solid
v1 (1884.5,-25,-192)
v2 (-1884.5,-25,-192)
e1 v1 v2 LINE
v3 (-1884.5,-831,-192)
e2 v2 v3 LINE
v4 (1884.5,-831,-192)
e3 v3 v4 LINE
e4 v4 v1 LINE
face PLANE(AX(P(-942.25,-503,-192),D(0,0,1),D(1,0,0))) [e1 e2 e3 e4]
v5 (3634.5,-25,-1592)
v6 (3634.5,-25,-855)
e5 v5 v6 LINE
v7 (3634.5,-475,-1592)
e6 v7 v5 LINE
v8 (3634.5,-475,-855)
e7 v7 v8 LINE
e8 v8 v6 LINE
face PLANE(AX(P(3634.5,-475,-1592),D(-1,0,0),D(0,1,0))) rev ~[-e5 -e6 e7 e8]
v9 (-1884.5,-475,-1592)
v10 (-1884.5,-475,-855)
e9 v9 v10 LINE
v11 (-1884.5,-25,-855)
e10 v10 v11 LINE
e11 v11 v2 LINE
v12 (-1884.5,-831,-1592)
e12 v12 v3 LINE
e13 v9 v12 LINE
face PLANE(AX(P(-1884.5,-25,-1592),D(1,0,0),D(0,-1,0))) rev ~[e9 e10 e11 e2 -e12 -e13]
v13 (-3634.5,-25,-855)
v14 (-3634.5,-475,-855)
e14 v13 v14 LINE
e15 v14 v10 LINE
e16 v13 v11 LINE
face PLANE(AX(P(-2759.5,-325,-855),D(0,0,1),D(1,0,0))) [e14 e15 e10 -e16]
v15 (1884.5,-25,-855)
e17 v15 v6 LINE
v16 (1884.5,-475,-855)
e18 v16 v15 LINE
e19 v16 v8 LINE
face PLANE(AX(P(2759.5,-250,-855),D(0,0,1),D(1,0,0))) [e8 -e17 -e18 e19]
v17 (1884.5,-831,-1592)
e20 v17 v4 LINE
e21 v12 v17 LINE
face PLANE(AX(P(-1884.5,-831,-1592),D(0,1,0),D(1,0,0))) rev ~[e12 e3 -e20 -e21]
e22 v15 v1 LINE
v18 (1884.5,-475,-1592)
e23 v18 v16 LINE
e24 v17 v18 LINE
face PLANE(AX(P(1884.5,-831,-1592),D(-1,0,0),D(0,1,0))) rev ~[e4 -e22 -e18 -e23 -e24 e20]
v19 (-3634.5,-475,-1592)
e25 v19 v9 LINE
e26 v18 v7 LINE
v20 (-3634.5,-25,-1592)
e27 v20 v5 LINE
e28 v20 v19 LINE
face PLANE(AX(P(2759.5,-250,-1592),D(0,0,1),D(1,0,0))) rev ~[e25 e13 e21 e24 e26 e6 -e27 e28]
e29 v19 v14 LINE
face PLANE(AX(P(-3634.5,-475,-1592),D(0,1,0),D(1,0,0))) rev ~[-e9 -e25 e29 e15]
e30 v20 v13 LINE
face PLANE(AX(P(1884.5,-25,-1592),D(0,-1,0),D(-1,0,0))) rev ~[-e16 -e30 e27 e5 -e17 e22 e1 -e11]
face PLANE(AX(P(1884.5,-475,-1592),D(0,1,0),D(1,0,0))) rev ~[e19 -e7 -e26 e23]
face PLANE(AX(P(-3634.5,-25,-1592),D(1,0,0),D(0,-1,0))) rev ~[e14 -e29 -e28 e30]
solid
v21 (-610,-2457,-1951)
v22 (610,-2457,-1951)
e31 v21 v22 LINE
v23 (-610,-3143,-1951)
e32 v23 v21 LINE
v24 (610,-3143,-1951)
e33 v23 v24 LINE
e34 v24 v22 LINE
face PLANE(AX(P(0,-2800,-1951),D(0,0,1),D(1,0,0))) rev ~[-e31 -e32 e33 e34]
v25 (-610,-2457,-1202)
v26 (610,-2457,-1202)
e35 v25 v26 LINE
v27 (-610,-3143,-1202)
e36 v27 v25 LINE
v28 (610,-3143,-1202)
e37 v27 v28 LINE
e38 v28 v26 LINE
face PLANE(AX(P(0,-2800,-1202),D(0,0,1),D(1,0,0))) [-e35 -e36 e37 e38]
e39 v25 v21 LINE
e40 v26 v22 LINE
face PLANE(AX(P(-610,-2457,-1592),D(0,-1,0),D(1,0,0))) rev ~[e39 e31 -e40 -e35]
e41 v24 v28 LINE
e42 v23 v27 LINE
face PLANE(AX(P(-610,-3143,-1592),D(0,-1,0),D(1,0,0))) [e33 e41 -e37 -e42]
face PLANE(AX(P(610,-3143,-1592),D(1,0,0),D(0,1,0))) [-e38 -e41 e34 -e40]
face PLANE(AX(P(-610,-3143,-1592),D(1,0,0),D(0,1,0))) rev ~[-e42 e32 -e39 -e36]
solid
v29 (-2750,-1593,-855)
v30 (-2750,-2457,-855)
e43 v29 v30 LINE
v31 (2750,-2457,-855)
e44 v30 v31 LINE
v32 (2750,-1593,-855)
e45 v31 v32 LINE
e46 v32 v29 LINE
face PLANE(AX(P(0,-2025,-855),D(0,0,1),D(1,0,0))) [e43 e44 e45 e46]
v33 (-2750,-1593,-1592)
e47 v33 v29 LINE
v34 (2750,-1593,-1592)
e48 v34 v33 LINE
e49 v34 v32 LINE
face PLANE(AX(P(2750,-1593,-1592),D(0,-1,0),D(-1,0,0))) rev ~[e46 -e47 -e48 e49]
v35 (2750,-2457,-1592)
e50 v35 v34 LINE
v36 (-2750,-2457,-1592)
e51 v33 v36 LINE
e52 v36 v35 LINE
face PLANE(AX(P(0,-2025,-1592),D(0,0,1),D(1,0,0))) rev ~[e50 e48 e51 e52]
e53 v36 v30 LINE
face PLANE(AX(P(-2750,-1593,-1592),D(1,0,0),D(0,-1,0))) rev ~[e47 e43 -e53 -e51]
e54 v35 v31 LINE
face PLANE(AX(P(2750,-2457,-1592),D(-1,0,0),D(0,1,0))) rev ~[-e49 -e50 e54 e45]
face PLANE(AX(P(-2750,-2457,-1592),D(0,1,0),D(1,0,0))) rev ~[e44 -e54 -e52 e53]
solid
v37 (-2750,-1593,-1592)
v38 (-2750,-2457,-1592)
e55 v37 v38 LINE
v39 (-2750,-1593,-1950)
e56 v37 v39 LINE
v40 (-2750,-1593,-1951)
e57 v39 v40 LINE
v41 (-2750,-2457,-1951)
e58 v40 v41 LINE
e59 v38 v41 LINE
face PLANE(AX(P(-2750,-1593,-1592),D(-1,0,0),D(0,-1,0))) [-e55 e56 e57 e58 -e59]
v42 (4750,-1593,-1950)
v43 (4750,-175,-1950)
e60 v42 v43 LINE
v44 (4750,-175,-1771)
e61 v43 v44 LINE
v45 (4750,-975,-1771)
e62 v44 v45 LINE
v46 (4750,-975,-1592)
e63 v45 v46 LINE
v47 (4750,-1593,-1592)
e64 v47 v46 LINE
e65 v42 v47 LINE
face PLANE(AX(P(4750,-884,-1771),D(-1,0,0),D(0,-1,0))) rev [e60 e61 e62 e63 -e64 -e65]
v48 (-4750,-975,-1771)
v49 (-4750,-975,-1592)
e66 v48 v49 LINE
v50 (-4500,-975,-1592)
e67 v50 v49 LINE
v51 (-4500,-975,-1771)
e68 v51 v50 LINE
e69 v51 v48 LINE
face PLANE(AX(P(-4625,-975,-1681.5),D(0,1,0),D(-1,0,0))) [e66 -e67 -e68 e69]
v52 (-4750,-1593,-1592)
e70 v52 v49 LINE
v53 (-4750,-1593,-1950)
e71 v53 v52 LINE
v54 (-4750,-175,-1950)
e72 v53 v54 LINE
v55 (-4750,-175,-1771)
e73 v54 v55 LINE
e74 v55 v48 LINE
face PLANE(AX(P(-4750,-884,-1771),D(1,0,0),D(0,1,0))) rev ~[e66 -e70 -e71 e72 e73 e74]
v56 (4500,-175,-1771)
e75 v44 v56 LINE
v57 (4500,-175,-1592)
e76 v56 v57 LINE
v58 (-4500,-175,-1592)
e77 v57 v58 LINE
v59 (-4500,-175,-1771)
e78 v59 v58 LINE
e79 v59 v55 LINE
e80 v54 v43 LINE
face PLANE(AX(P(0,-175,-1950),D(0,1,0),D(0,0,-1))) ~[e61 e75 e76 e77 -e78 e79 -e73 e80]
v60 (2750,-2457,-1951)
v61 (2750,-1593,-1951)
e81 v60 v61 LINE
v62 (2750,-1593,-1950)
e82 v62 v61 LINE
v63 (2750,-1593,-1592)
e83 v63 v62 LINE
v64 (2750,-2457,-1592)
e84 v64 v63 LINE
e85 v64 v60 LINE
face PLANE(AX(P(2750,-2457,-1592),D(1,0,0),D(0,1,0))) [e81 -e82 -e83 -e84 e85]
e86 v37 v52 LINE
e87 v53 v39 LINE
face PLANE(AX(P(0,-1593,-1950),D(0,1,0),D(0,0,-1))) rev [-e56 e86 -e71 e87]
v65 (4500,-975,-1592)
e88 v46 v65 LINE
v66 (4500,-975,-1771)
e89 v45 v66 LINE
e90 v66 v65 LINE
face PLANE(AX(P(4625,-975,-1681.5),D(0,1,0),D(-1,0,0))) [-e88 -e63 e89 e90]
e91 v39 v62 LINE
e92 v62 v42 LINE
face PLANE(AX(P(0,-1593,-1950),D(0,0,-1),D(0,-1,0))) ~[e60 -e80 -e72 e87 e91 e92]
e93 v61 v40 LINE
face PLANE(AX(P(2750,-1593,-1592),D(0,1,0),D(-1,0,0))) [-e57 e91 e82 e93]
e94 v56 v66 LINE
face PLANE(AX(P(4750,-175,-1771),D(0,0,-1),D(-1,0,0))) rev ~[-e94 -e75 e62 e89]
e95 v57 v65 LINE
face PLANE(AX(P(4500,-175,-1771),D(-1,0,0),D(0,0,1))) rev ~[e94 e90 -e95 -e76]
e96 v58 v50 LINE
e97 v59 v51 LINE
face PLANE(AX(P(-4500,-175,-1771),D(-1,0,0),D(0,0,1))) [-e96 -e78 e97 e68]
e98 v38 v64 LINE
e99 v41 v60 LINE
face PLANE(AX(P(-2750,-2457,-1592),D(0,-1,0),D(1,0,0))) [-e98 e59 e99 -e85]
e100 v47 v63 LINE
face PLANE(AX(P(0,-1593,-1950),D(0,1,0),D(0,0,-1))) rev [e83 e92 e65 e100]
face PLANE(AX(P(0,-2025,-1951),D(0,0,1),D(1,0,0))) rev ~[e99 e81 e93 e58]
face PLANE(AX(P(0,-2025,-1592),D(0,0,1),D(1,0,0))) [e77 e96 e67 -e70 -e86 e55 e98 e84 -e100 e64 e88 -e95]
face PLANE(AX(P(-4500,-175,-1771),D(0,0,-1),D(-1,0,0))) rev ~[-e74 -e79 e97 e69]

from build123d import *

# Parameters (mm, degrees)
F0_W      = 1418
F0_H      = 358
F1_DEPTH  = 4750
F4_DEPTH  = 1400
F5_DEPTH  = 737
F3_W      = 1220
F3_H      = 686
F6_DEPTH  = 390
F7_DEPTH  = 359
F8_DEPTH  = 359
F10_W     = 250
F10_H     = 179
F11_DEPTH = 800
F3_W_2    = 1750
F3_H_2    = 450
F3_H_3    = 300
F3_H_4    = 150
F12_DEPTH = 737


with BuildPart() as f1:
    # F0 (on Right) → F1 (new body)
    with BuildSketch(Plane.YZ):
        with Locations((-884, -1771)):
            Rectangle(F0_W, F0_H)
    extrude(amount=-F1_DEPTH)


with BuildPart() as f2_1:
    # F2: instance of F1
    add(f1.part.mirror(Plane(origin=(0, -884, -1771), x_dir=(0, 1, 0), z_dir=(1, 0, 0))))


with BuildPart() as f4:
    # F3 (on face) → F4 (new body)
    with BuildSketch(Plane.XY.offset(-1592)):
        Polygon((0, -175), (-1884.5, -175), (-1884.5, -475), (-1884.5, -831), (0, -831), align=None)
        Polygon((1884.5, -475), (1884.5, -25), (-1884.5, -25), (-1884.5, -175), (0, -175), (0, -831), (1884.5, -831), align=None)
    extrude(amount=F4_DEPTH)

    # F3 (on face) → F12 (join)
    with BuildSketch(Plane.XY.offset(-1592)):
        with Locations((2759.5, -250)):
            Rectangle(F3_W_2, F3_H_2)
        with Locations((-2759.5, -325)):
            Rectangle(F3_W_2, F3_H_3)
        with Locations((-2759.5, -100)):
            Rectangle(F3_W_2, F3_H_4)
    extrude(amount=F12_DEPTH)


with BuildPart() as f5:
    # F3 (on face) → F5 (new body)
    with BuildSketch(Plane.XY.offset(-1592)):
        Polygon((2750, -1593), (0, -1593), (-2750, -1593), (-2750, -2457), (-610, -2457), (610, -2457), (2750, -2457), align=None)
    extrude(amount=F5_DEPTH)


with BuildPart() as f6:
    # F3 (on face) → F6 (new body)
    with BuildSketch(Plane.XY.offset(-1592)):
        with Locations((0, -2800)):
            Rectangle(F3_W, F3_H)
    extrude(amount=F6_DEPTH)

    # F3 (on face) → F7 (join)
    with BuildSketch(Plane.XY.offset(-1592)):
        with Locations((0, -2800)):
            Rectangle(F3_W, F3_H)
    extrude(amount=-F7_DEPTH)


with BuildPart() as f1_1:
    add(f1.part)

    add(f2_1.part)  # F8 merges F2_1
    # F3 (on face) → F8 (join)
    with BuildSketch(Plane.XY.offset(-1592)):
        Polygon((2750, -1593), (0, -1593), (-2750, -1593), (-2750, -2457), (-610, -2457), (610, -2457), (2750, -2457), align=None)
    extrude(amount=-F8_DEPTH)

    # F9: union 

    # F10 (on face) → F11 (cut)
    with BuildSketch(Plane(origin=(0, -175, 0), x_dir=(-1, 0, 0), z_dir=(0, 1, 0))):
        with Locations((4625, -1681.5)):
            Rectangle(F10_W, F10_H)
        with Locations((-4625, -1681.5)):
            Rectangle(F10_W, F10_H)
    extrude(amount=-F11_DEPTH, mode=Mode.SUBTRACT)


solid = Compound([f4.part, f5.part, f6.part, f1_1.part])
